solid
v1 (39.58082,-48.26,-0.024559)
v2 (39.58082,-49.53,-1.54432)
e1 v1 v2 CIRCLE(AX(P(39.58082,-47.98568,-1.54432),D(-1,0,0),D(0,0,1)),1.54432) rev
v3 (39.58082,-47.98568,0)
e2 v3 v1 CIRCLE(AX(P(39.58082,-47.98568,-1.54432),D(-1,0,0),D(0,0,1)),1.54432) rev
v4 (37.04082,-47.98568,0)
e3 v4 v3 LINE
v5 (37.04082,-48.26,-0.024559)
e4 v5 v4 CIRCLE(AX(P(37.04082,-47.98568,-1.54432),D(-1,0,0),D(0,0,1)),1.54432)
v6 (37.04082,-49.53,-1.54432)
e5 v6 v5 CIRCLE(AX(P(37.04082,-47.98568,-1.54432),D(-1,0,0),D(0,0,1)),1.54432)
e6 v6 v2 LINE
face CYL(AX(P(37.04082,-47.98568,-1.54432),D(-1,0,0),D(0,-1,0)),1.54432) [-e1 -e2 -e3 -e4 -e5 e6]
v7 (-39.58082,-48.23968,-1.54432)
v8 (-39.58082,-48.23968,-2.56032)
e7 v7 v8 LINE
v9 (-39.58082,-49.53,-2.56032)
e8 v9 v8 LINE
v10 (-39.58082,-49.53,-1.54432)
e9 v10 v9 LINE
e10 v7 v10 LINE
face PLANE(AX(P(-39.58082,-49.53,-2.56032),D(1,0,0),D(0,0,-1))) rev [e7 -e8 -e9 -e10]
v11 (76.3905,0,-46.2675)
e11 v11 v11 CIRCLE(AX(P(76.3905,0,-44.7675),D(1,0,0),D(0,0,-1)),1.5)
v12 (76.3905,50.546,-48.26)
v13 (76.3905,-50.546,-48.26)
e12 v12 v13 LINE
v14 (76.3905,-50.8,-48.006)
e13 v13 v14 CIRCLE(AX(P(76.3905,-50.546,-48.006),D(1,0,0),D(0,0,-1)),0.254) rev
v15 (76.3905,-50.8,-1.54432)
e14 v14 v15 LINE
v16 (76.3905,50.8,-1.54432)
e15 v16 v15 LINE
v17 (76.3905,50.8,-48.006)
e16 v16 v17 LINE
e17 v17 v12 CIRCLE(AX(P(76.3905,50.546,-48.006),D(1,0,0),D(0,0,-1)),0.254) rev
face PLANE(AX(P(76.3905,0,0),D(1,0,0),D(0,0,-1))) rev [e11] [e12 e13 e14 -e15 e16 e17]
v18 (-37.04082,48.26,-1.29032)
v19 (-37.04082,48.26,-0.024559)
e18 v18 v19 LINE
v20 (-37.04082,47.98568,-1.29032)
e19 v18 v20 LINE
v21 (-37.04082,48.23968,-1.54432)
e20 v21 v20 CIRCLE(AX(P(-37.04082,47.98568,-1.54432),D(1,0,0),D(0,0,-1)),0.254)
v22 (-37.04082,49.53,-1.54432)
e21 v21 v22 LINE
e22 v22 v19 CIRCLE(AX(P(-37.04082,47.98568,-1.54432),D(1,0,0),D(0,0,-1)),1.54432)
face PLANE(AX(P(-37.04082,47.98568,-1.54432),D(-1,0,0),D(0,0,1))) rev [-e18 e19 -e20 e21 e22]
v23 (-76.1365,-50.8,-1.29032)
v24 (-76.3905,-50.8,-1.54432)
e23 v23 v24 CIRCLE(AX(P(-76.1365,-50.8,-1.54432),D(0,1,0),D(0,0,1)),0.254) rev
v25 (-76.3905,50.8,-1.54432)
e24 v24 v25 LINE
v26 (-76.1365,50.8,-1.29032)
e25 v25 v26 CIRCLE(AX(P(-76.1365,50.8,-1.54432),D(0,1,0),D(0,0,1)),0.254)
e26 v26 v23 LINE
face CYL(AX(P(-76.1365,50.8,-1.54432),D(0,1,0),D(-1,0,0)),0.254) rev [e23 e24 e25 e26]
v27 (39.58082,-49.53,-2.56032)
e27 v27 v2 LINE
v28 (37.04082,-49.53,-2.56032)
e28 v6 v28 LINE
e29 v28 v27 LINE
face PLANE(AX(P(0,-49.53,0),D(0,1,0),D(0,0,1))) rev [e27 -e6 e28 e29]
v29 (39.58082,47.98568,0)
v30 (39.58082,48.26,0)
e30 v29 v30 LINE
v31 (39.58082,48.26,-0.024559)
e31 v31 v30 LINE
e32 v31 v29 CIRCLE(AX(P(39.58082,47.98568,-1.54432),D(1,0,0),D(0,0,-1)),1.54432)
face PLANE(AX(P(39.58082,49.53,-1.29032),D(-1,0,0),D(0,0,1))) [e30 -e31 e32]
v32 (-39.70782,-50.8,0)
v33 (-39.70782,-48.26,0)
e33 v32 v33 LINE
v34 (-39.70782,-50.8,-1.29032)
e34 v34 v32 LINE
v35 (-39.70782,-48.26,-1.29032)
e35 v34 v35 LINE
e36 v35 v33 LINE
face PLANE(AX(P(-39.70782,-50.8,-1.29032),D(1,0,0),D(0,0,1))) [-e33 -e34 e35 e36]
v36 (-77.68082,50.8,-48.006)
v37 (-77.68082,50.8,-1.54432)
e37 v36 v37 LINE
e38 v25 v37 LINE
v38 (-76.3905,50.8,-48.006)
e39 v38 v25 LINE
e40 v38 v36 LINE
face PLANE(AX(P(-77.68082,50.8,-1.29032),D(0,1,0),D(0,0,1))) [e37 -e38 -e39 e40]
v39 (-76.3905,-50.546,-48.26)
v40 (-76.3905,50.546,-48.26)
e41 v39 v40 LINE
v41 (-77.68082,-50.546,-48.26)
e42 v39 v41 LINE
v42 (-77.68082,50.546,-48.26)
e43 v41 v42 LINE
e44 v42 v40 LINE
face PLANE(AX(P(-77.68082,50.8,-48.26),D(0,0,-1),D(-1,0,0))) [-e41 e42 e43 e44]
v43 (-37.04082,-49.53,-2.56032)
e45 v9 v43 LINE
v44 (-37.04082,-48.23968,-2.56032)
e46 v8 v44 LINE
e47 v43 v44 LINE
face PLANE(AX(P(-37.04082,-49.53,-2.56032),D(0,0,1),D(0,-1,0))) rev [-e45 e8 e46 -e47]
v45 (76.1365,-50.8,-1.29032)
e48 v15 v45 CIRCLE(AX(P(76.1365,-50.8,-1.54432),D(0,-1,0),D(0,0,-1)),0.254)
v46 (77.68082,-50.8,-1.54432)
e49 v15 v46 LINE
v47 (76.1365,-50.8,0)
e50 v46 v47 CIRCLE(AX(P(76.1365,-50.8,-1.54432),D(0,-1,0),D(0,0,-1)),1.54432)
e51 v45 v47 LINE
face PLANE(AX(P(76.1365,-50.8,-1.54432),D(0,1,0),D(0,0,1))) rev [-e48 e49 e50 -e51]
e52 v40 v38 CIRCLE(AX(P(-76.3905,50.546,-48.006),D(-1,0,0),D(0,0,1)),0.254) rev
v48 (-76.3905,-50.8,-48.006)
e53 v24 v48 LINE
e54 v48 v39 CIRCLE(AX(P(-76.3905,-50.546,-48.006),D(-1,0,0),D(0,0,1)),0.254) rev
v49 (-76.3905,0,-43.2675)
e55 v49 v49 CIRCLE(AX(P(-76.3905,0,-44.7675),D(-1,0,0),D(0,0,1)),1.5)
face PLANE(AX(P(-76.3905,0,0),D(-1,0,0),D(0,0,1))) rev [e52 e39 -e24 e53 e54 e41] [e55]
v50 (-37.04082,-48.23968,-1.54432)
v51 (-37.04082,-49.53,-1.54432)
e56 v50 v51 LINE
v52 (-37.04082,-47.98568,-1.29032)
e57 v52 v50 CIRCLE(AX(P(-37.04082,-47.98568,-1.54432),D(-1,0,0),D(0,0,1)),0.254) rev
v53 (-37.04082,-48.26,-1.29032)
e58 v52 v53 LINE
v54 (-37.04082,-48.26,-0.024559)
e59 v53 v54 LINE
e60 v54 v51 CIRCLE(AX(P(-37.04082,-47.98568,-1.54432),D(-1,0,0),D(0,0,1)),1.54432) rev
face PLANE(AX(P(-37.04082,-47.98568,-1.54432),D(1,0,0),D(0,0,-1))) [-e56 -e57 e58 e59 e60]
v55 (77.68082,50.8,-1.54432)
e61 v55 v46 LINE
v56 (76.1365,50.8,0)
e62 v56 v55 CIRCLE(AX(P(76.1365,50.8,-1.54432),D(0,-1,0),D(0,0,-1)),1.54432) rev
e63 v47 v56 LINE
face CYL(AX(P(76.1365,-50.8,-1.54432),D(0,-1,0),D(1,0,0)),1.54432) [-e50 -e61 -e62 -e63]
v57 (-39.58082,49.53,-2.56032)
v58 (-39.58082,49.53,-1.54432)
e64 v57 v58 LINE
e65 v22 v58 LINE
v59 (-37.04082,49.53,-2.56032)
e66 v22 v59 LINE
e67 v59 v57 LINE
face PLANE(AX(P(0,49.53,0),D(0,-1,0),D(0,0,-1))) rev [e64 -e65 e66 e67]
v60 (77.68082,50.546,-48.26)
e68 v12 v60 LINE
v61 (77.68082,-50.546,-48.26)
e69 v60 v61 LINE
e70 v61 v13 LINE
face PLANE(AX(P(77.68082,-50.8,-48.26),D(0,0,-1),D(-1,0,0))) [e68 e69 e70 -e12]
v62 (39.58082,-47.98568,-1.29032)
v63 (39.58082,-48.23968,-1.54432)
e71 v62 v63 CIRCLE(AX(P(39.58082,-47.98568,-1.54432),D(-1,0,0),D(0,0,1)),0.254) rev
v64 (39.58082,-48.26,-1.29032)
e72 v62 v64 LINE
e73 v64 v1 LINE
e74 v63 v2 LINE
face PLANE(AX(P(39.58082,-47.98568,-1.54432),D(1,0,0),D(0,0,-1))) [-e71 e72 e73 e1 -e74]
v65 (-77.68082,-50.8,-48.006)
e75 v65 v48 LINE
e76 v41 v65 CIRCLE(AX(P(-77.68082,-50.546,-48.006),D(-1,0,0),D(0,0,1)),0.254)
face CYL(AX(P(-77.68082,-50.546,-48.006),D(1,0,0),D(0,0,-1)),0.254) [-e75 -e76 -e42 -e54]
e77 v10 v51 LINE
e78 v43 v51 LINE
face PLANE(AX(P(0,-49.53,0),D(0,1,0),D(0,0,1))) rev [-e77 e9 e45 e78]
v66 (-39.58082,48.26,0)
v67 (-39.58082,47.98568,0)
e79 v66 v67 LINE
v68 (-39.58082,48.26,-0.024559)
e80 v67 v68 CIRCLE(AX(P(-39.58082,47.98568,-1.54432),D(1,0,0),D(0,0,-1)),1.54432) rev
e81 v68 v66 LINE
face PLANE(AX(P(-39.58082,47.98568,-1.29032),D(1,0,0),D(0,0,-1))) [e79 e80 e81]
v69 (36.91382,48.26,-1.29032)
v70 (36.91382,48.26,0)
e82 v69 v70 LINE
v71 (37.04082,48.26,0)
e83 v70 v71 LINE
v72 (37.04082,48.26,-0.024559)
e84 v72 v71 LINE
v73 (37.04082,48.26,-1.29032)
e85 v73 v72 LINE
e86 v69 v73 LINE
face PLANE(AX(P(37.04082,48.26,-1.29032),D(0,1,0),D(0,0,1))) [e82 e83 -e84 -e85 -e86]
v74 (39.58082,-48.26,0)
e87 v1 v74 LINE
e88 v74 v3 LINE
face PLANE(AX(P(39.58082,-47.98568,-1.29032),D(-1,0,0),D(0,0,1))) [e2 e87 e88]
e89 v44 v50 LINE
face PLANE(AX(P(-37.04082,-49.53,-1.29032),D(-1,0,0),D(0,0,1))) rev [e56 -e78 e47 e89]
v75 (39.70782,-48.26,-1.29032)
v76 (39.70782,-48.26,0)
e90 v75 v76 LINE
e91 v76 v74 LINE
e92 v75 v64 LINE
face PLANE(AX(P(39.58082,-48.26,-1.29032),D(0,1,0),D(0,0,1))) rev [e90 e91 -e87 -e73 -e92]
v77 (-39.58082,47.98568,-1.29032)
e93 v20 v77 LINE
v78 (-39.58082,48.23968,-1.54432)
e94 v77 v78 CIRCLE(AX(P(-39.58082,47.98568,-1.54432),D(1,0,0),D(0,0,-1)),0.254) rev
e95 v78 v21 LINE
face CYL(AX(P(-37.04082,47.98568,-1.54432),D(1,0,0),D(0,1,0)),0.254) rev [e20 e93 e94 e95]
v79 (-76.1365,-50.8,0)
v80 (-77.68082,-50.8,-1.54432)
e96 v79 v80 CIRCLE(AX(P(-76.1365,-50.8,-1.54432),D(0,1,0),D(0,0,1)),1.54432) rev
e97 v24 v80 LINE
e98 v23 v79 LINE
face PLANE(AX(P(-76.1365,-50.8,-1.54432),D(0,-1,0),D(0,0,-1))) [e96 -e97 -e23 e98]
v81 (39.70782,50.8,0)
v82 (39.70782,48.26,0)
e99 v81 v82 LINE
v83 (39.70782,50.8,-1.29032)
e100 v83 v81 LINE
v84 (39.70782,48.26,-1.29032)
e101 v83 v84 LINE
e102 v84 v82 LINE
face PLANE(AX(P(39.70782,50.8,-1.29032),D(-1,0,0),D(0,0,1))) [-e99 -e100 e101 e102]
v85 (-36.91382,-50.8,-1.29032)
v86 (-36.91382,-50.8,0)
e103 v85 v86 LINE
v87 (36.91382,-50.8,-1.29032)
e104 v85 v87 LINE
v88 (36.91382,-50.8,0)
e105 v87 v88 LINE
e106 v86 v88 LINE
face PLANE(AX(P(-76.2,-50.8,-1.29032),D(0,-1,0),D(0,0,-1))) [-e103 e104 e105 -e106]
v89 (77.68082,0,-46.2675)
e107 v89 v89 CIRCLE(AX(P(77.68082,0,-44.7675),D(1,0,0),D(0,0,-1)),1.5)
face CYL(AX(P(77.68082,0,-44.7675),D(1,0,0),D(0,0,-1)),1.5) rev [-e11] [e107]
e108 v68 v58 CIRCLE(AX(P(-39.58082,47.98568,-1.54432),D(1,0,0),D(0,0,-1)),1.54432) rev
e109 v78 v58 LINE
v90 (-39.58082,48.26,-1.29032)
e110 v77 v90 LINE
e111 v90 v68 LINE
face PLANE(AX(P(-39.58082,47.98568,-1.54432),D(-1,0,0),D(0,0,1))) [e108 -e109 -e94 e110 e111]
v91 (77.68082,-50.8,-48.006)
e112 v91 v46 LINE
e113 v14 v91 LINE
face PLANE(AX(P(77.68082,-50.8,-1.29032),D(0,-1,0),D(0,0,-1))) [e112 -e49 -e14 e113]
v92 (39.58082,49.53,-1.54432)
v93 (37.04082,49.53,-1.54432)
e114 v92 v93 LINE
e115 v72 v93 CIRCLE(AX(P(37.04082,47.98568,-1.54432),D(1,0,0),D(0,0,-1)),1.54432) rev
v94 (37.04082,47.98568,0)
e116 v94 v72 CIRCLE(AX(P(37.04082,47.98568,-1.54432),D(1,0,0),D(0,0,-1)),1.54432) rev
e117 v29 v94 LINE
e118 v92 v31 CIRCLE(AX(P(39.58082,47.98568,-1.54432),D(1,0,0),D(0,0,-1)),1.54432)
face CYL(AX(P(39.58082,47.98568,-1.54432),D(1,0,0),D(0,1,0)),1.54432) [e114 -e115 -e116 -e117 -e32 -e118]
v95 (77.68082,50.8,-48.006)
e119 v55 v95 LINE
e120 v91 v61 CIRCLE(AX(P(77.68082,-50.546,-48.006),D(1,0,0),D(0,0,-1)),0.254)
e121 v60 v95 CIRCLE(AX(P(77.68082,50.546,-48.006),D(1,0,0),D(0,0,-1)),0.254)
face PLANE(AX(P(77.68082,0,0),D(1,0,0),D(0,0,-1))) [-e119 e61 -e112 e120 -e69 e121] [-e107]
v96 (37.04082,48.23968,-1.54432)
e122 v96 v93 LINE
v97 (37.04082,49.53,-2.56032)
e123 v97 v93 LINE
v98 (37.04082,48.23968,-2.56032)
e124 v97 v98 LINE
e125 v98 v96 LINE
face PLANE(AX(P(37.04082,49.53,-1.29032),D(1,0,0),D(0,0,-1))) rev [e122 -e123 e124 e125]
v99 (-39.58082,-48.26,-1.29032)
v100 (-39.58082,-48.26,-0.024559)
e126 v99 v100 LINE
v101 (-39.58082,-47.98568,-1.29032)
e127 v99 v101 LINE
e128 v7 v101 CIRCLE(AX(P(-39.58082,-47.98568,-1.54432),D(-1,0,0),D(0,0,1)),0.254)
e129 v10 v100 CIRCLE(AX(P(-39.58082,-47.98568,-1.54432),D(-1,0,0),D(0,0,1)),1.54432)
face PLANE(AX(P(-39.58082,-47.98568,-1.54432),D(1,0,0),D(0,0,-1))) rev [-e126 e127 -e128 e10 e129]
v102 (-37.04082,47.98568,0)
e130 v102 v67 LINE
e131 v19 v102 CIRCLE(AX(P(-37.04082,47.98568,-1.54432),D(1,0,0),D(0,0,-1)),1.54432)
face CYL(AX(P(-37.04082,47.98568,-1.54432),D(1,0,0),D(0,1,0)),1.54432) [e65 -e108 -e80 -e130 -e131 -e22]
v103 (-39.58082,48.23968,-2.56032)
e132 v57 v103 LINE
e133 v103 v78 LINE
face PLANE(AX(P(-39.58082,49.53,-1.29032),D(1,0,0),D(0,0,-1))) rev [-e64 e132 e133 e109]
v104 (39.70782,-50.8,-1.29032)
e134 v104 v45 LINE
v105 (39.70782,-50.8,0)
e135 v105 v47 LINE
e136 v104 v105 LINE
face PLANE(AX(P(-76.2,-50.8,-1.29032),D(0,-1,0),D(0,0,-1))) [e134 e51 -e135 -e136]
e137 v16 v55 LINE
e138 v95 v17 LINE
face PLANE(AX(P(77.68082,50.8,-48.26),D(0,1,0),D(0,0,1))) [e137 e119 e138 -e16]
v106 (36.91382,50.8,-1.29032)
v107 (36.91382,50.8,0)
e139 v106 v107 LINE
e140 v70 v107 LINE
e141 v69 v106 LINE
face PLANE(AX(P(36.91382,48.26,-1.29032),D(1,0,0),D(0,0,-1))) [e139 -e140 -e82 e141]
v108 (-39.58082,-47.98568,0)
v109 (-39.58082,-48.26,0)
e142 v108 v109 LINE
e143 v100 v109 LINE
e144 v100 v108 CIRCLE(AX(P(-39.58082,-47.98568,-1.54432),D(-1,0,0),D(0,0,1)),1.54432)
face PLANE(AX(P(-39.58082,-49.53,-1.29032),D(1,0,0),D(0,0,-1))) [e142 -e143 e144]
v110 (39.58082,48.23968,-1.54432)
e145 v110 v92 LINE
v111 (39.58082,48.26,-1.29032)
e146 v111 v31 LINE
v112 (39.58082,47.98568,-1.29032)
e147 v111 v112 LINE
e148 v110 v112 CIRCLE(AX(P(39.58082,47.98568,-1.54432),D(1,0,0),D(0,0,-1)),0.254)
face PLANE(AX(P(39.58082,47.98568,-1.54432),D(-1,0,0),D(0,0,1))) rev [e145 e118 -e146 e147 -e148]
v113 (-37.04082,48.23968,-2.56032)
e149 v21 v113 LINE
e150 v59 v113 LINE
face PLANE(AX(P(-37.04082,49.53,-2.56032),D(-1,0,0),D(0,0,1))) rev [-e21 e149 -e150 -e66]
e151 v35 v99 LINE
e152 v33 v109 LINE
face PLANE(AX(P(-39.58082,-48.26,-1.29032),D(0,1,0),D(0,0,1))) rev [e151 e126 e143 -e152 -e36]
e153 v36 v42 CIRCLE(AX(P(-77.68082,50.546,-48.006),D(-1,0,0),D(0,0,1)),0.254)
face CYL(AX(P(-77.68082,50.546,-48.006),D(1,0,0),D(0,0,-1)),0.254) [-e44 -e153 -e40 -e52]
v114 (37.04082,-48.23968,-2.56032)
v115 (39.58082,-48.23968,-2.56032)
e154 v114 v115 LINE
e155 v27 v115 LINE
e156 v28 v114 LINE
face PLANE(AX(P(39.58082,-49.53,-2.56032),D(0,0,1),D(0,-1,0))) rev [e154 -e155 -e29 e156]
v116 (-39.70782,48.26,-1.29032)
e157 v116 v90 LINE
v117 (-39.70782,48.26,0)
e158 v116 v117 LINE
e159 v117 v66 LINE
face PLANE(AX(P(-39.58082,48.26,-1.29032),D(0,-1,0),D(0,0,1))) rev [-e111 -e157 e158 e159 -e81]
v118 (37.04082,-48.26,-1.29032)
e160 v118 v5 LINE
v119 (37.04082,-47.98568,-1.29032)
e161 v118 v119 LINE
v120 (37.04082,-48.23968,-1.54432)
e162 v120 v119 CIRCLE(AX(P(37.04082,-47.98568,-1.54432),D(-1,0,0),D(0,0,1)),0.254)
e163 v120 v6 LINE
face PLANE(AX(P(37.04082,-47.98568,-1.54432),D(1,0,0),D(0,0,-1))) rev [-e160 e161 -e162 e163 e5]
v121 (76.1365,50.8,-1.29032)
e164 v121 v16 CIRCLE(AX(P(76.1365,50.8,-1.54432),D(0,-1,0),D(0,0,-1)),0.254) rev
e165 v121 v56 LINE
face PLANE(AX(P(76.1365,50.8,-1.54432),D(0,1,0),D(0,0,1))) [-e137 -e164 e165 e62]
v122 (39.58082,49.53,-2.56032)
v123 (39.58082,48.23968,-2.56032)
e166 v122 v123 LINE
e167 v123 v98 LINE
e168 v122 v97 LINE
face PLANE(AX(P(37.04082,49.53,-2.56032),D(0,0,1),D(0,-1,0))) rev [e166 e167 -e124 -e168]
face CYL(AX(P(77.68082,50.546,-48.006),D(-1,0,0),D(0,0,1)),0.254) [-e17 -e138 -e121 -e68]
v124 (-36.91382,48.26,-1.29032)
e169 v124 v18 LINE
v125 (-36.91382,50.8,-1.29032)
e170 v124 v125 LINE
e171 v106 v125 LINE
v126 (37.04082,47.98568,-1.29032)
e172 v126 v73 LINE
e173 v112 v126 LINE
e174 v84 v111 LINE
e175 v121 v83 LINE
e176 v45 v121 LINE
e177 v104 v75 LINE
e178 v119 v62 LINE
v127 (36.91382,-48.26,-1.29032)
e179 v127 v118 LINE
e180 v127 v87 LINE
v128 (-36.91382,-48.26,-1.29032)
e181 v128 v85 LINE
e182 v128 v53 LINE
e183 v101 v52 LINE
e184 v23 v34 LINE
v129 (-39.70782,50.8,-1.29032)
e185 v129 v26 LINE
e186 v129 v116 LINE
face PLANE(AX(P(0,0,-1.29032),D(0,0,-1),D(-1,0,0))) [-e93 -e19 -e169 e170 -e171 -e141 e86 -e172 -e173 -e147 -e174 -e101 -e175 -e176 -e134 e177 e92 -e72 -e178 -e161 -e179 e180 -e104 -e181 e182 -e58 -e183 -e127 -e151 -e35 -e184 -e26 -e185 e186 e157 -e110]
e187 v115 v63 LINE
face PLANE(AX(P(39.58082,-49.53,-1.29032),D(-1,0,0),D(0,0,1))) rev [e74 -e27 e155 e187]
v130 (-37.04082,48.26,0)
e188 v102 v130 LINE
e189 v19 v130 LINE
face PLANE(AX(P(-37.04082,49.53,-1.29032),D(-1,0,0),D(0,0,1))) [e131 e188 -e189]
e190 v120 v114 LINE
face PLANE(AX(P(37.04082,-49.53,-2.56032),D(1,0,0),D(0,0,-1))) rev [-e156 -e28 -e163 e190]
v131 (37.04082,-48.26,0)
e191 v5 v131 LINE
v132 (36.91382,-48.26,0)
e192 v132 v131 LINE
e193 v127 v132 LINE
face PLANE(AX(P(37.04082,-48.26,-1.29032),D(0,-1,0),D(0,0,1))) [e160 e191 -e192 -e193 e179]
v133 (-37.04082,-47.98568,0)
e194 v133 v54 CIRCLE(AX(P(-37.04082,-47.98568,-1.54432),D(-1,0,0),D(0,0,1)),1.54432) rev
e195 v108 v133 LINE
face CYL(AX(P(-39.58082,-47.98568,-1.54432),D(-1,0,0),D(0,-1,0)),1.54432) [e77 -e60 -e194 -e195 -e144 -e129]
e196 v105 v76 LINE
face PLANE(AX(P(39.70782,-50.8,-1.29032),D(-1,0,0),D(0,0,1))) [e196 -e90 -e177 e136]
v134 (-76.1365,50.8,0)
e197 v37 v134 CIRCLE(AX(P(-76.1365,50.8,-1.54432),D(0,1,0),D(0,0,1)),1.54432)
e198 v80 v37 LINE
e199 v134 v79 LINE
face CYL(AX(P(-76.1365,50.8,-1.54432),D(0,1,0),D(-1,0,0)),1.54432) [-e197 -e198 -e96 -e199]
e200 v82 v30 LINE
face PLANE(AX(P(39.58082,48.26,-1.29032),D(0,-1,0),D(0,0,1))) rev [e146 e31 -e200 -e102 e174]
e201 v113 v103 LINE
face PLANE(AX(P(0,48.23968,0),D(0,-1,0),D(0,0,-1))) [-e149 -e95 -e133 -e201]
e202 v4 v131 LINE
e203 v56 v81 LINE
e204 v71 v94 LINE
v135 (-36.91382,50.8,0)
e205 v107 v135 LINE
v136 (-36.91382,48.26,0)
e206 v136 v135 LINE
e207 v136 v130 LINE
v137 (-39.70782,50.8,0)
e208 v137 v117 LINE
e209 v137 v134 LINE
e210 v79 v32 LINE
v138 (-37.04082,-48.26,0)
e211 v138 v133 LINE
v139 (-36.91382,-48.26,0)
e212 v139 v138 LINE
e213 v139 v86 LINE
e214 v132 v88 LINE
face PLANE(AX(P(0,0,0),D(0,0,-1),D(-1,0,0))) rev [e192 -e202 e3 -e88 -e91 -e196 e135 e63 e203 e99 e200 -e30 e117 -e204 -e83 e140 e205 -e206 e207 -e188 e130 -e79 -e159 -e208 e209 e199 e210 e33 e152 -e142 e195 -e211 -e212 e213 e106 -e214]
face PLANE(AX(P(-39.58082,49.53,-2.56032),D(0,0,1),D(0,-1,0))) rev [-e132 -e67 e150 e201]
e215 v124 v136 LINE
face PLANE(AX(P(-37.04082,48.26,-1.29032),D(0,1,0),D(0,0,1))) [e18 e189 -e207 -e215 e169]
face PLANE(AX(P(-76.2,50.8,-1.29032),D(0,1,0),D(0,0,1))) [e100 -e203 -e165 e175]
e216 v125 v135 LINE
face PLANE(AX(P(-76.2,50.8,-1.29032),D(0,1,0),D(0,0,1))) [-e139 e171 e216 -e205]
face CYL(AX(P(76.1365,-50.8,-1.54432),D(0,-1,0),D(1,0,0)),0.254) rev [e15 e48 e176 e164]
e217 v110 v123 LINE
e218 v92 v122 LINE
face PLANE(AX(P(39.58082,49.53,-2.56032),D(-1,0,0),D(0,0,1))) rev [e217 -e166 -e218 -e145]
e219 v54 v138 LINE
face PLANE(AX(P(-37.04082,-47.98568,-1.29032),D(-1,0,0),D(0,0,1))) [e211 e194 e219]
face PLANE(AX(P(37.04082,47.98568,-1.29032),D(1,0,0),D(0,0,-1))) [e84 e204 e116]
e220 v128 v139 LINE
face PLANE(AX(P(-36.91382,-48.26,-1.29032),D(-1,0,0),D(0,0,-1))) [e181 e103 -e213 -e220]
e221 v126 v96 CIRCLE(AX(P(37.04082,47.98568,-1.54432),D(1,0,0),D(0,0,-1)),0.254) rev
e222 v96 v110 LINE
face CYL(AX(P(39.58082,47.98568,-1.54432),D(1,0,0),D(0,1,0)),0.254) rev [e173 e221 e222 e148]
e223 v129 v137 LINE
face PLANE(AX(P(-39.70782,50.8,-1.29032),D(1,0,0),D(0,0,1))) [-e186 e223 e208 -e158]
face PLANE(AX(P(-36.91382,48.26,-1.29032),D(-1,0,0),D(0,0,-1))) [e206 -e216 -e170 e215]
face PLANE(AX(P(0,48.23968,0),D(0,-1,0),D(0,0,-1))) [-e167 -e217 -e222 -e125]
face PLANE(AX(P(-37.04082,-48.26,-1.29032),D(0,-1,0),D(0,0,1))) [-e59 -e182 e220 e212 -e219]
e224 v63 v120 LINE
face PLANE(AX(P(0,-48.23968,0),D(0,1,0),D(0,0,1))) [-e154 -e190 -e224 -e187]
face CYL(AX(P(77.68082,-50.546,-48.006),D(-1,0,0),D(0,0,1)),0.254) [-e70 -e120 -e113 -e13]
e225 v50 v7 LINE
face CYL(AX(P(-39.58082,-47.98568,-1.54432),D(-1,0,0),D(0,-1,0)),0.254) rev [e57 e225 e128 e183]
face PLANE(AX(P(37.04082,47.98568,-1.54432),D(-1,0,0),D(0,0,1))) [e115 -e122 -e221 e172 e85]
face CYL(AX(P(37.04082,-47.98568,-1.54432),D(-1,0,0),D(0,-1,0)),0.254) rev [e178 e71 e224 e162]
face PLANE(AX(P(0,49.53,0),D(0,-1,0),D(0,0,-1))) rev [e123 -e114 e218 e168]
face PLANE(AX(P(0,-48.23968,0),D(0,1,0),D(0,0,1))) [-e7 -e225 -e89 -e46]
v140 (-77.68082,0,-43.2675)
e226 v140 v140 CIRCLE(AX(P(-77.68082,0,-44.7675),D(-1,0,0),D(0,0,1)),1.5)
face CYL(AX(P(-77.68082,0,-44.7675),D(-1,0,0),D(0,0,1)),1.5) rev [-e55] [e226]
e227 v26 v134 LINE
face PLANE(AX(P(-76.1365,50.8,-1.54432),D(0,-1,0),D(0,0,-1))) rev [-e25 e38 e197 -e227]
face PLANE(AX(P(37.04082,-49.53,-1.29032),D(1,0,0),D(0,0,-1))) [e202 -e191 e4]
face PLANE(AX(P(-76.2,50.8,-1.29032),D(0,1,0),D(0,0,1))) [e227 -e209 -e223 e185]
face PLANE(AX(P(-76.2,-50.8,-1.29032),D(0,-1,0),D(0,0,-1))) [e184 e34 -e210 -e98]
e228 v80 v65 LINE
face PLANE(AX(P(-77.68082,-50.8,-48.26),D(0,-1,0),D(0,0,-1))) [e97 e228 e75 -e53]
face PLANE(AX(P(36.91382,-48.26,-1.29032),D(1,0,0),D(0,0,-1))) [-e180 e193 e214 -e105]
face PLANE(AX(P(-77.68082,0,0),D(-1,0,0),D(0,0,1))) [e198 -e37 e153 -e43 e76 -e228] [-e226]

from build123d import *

# Parameters (mm, degrees)
SKETCH1_W                      = 152.4
SKETCH1_H                      = 101.6
BASE_FLANGE1_DEPTH             = 1.29032
EDGE_FLANGE1_STRIP_W           = 5.85978
EDGE_FLANGE1_STRIP_H           = 1.29032
EDGE_FLANGE1_STRIP_CUT_DEPTH   = 101.6
EDGE_FLANGE1_STRIP_2_W         = 5.85978
EDGE_FLANGE1_STRIP_2_H         = 1.29032
EDGE_FLANGE1_STRIP_CUT_2_DEPTH = 101.6
EDGE_FLANGE1_DEPTH             = 101.6
EDGE_FLANGE1_BEND_DEPTH        = 101.6
M3X0_5_TAPPED_HOLE1_REACH      = 172.432
M3X0_5_TAPPED_HOLE1_BORE_R     = 1.5
BREAK_CORNER1_START            = -77.68082
BREAK_CORNER1_DEPTH            = 155.36164
CUT_THICKEN1_START             = 48.26
CUT_THICKEN1_OUTLINE_W         = 0.127
CUT_THICKEN1_OUTLINE_H         = 1.29032
CUT_THICKEN1_DEPTH             = 2.54
CUT_THICKEN2_START             = 48.26
CUT_THICKEN2_OUTLINE_W         = 0.127
CUT_THICKEN2_OUTLINE_H         = 1.29032
CUT_THICKEN2_DEPTH             = 2.54
MIRROR7_START                  = 48.26
MIRROR7_COPY_1_SKETCH_W        = 0.127
MIRROR7_COPY_1_SKETCH_H        = 1.29032
MIRROR7_COPY_1_DEPTH           = 2.54
MIRROR7_COPY_2_SKETCH_W        = 0.127
MIRROR7_COPY_2_SKETCH_H        = 1.29032
MIRROR7_COPY_2_DEPTH           = 2.54
MOVE_FACE1_BY                  = 1.27
MOVE_FACE1_2_BY                = 1.27
MOVE_FACE1_3_BY                = 1.27
MOVE_FACE1_4_BY                = 1.27
EDGE_FLANGE2_STRIP_W           = 5.66928
EDGE_FLANGE2_STRIP_H           = 1.29032
EDGE_FLANGE2_STRIP_CUT_DEPTH   = 2.54
EDGE_FLANGE2_STRIP_2_W         = 5.66928
EDGE_FLANGE2_STRIP_2_H         = 1.29032
EDGE_FLANGE2_STRIP_CUT_2_DEPTH = 2.54
EDGE_FLANGE2_STRIP_3_W         = 5.66928
EDGE_FLANGE2_STRIP_3_H         = 1.29032
EDGE_FLANGE2_STRIP_CUT_3_DEPTH = 2.54
EDGE_FLANGE2_STRIP_4_W         = 5.66928
EDGE_FLANGE2_STRIP_4_H         = 1.29032
EDGE_FLANGE2_STRIP_CUT_4_DEPTH = 2.54
EDGE_FLANGE2_DEPTH             = 2.54
EDGE_FLANGE2_BEND_DEPTH        = 2.54
EDGE_FLANGE2_BEND_2_DEPTH      = 2.54
EDGE_FLANGE2_BEND_3_DEPTH      = 2.54


# Read off the part's stored shape, not the designer's step: Break-Corner1, Cut-Thicken1, Cut-Thicken2
# Sheet-metal steps are written as plain solids
with BuildPart() as part:
    # Sketch1 → Base-Flange1 (new body)
    with BuildSketch(Plane.XY):
        Rectangle(SKETCH1_W, SKETCH1_H)
    extrude(amount=-BASE_FLANGE1_DEPTH)

    # Edge-Flange1 strip (across the edge) → Edge-Flange1 strip cut (cut)
    with BuildSketch(Plane(origin=(-76.3905, -50.8, -1.29032), x_dir=(1, 0, 0), z_dir=(0, 1, 0))):
        with Locations((-2.67589, -0.64516)):
            Rectangle(EDGE_FLANGE1_STRIP_W, EDGE_FLANGE1_STRIP_H)
    extrude(amount=EDGE_FLANGE1_STRIP_CUT_DEPTH, mode=Mode.SUBTRACT)

    # Edge-Flange1 strip 2 (across the edge) → Edge-Flange1 strip cut 2 (cut)
    with BuildSketch(Plane(origin=(76.3905, 50.8, -1.29032), x_dir=(-1, 0, 0), z_dir=(0, -1, 0))):
        with Locations((-2.67589, -0.64516)):
            Rectangle(EDGE_FLANGE1_STRIP_2_W, EDGE_FLANGE1_STRIP_2_H)
    extrude(amount=EDGE_FLANGE1_STRIP_CUT_2_DEPTH, mode=Mode.SUBTRACT)

    # Edge-Flange1 section (across the edge) → Edge-Flange1 (add)
    with BuildSketch(Plane(origin=(-76.3905, -50.8, -1.29032), x_dir=(1, 0, 0), z_dir=(0, 1, 0))):
        with BuildLine():
            Line((-1.29032, 0.254), (-1.29032, 46.96968))
            Line((-1.29032, 46.96968), (0, 46.96968))
            Line((0, 46.96968), (0, 0.254))
            ThreePointArc((0, 0.254), (0.074394878, 0.074394878), (0.254, 0))
            Line((0.254, 0), (0.254, -1.29032))
            ThreePointArc((0.254, -1.29032), (-0.837999144, -0.837999144), (-1.29032, 0.254))
        make_face()
    extrude(amount=EDGE_FLANGE1_DEPTH)

    # Edge-Flange1 section 2 (across the edge) → Edge-Flange1 bend (add)
    with BuildSketch(Plane(origin=(76.3905, 50.8, -1.29032), x_dir=(-1, 0, 0), z_dir=(0, -1, 0))):
        with BuildLine():
            Line((-1.29032, 0.254), (-1.29032, 46.96968))
            Line((-1.29032, 46.96968), (0, 46.96968))
            Line((0, 46.96968), (0, 0.254))
            ThreePointArc((0, 0.254), (0.074394878, 0.074394878), (0.254, 0))
            Line((0.254, 0), (0.254, -1.29032))
            ThreePointArc((0.254, -1.29032), (-0.837999144, -0.837999144), (-1.29032, 0.254))
        make_face()
    extrude(amount=EDGE_FLANGE1_BEND_DEPTH)

    # M3x0.5 Tapped Hole1 bore → M3x0.5 Tapped Hole1 (cut, up to next)
    with BuildSketch(Plane.ZY.offset(77.68082), mode=Mode.PRIVATE) as m3x0_5_tapped_hole1_sk1:
        with Locations((-44.7675, 0)):
            Circle(M3X0_5_TAPPED_HOLE1_BORE_R)
    m3x0_5_tapped_hole1_tool1 = extrude(m3x0_5_tapped_hole1_sk1.sketch, amount=-M3X0_5_TAPPED_HOLE1_REACH, mode=Mode.PRIVATE) & part.part
    m3x0_5_tapped_hole1 = m3x0_5_tapped_hole1_tool1.solids().sort_by_distance((-77.68082, 0, -44.7675))[0]
    add(m3x0_5_tapped_hole1, mode=Mode.SUBTRACT)

    # Mirror1: M3x0.5 Tapped Hole1 across plane
    add(m3x0_5_tapped_hole1.mirror(Plane(origin=(0, 0, 0), x_dir=(0, 0, 1), z_dir=(1, 0, 0))), mode=Mode.SUBTRACT)

    # Break-Corner1 outline → Break-Corner1 (cut)
    with BuildSketch(Plane.YZ.offset(BREAK_CORNER1_START)):
        with BuildLine():
            Line((50.8, -48.26), (50.8, -48.006))
            ThreePointArc((50.8, -48.006), (50.725605122, -48.185605122), (50.546, -48.26))
            Line((50.546, -48.26), (50.8, -48.26))
        make_face()
        with BuildLine():
            Line((-50.8, -48.26), (-50.546, -48.26))
            ThreePointArc((-50.546, -48.26), (-50.725605122, -48.185605122), (-50.8, -48.006))
            Line((-50.8, -48.006), (-50.8, -48.26))
        make_face()
    extrude(amount=BREAK_CORNER1_DEPTH, mode=Mode.SUBTRACT)

    # Cut-Thicken1 outline → Cut-Thicken1 (cut)
    with BuildSketch(Plane(origin=(0, 0, 0), x_dir=(1, 0, 0), z_dir=(0, 1, 0)).offset(CUT_THICKEN1_START)):
        with Locations((36.97732, 0.64516)):
            Rectangle(CUT_THICKEN1_OUTLINE_W, CUT_THICKEN1_OUTLINE_H)
    cut_thicken1 = extrude(amount=CUT_THICKEN1_DEPTH, mode=Mode.SUBTRACT)

    # Cut-Thicken2 outline → Cut-Thicken2 (cut)
    with BuildSketch(Plane(origin=(0, 0, 0), x_dir=(1, 0, 0), z_dir=(0, 1, 0)).offset(CUT_THICKEN2_START)):
        with Locations((39.64432, 0.64516)):
            Rectangle(CUT_THICKEN2_OUTLINE_W, CUT_THICKEN2_OUTLINE_H)
    cut_thicken2 = extrude(amount=CUT_THICKEN2_DEPTH, mode=Mode.SUBTRACT)

    # Mirror6: Cut-Thicken1, Cut-Thicken2 across plane
    add(cut_thicken1.mirror(Plane(origin=(0, 0, 0), x_dir=(0, 0, 1), z_dir=(1, 0, 0))), mode=Mode.SUBTRACT)
    add(cut_thicken2.mirror(Plane(origin=(0, 0, 0), x_dir=(0, 0, 1), z_dir=(1, 0, 0))), mode=Mode.SUBTRACT)

    # Mirror7: Cut-Thicken1, Cut-Thicken2 across plane
    add(cut_thicken1.mirror(Plane.ZX), mode=Mode.SUBTRACT)
    add(cut_thicken2.mirror(Plane.ZX), mode=Mode.SUBTRACT)

    # Mirror7 copy 1 sketch → Mirror7 copy 1 (cut)
    with BuildSketch(Plane(origin=(0, 0, 0), x_dir=(-1, 0, 0), z_dir=(0, -1, 0)).offset(MIRROR7_START)):
        with Locations((36.97732, 0.64516)):
            Rectangle(MIRROR7_COPY_1_SKETCH_W, MIRROR7_COPY_1_SKETCH_H)
    extrude(amount=MIRROR7_COPY_1_DEPTH, mode=Mode.SUBTRACT)

    # Mirror7 copy 2 sketch → Mirror7 copy 2 (cut)
    with BuildSketch(Plane(origin=(0, 0, 0), x_dir=(-1, 0, 0), z_dir=(0, -1, 0)).offset(MIRROR7_START)):
        with Locations((39.64432, 0.64516)):
            Rectangle(MIRROR7_COPY_2_SKETCH_W, MIRROR7_COPY_2_SKETCH_H)
    extrude(amount=MIRROR7_COPY_2_DEPTH, mode=Mode.SUBTRACT)

    # Move Face1: a face moved inward by 1.27
    extrude(part.faces().sort_by_distance((-38.31082, -50.8, -0.64516))[0], amount=MOVE_FACE1_BY, dir=(0, 1, 0), mode=Mode.SUBTRACT)

    # Move Face1 2: a face moved inward by 1.27
    extrude(part.faces().sort_by_distance((38.31082, -50.8, -0.64516))[0], amount=MOVE_FACE1_2_BY, dir=(0, 1, 0), mode=Mode.SUBTRACT)

    # Move Face1 3: a face moved inward by 1.27
    extrude(part.faces().sort_by_distance((-38.31082, 50.8, -0.64516))[0], amount=MOVE_FACE1_3_BY, dir=(0, -1, 0), mode=Mode.SUBTRACT)

    # Move Face1 4: a face moved inward by 1.27
    extrude(part.faces().sort_by_distance((38.31082, 50.8, -0.64516))[0], amount=MOVE_FACE1_4_BY, dir=(0, -1, 0), mode=Mode.SUBTRACT)

    # Edge-Flange2 strip (across the edge) → Edge-Flange2 strip cut (cut)
    with BuildSketch(Plane(origin=(37.04082, 49.53, -1.29032), x_dir=(0, -1, 0), z_dir=(1, 0, 0))):
        with Locations((-1.29032, -0.64516)):
            Rectangle(EDGE_FLANGE2_STRIP_W, EDGE_FLANGE2_STRIP_H)
    extrude(amount=EDGE_FLANGE2_STRIP_CUT_DEPTH, mode=Mode.SUBTRACT)

    # Edge-Flange2 strip 2 (across the edge) → Edge-Flange2 strip cut 2 (cut)
    with BuildSketch(Plane(origin=(-39.58082, 49.53, -1.29032), x_dir=(0, -1, 0), z_dir=(1, 0, 0))):
        with Locations((-1.29032, -0.64516)):
            Rectangle(EDGE_FLANGE2_STRIP_2_W, EDGE_FLANGE2_STRIP_2_H)
    extrude(amount=EDGE_FLANGE2_STRIP_CUT_2_DEPTH, mode=Mode.SUBTRACT)

    # Edge-Flange2 strip 3 (across the edge) → Edge-Flange2 strip cut 3 (cut)
    with BuildSketch(Plane(origin=(39.58082, -49.53, -1.29032), x_dir=(0, 1, 0), z_dir=(-1, 0, 0))):
        with Locations((-1.29032, -0.64516)):
            Rectangle(EDGE_FLANGE2_STRIP_3_W, EDGE_FLANGE2_STRIP_3_H)
    extrude(amount=EDGE_FLANGE2_STRIP_CUT_3_DEPTH, mode=Mode.SUBTRACT)

    # Edge-Flange2 strip 4 (across the edge) → Edge-Flange2 strip cut 4 (cut)
    with BuildSketch(Plane(origin=(-37.04082, -49.53, -1.29032), x_dir=(0, 1, 0), z_dir=(-1, 0, 0))):
        with Locations((-1.29032, -0.64516)):
            Rectangle(EDGE_FLANGE2_STRIP_4_W, EDGE_FLANGE2_STRIP_4_H)
    extrude(amount=EDGE_FLANGE2_STRIP_CUT_4_DEPTH, mode=Mode.SUBTRACT)

    # Edge-Flange2 section (across the edge) → Edge-Flange2 (add)
    with BuildSketch(Plane(origin=(37.04082, 49.53, -1.29032), x_dir=(0, -1, 0), z_dir=(1, 0, 0))):
        with BuildLine():
            Line((0, 0.254), (0, 1.27))
            Line((0, 1.27), (1.29032, 1.27))
            Line((1.29032, 1.27), (1.29032, 0.254))
            ThreePointArc((1.29032, 0.254), (1.364714878, 0.074394878), (1.54432, 0))
            Line((1.54432, 0), (1.54432, -1.29032))
            ThreePointArc((1.54432, -1.29032), (0.452320856, -0.837999144), (0, 0.254))
        make_face()
    extrude(amount=EDGE_FLANGE2_DEPTH)

    # Edge-Flange2 section 2 (across the edge) → Edge-Flange2 bend (add)
    with BuildSketch(Plane(origin=(-39.58082, 49.53, -1.29032), x_dir=(0, -1, 0), z_dir=(1, 0, 0))):
        with BuildLine():
            Line((0, 0.254), (0, 1.27))
            Line((0, 1.27), (1.29032, 1.27))
            Line((1.29032, 1.27), (1.29032, 0.254))
            ThreePointArc((1.29032, 0.254), (1.364714878, 0.074394878), (1.54432, 0))
            Line((1.54432, 0), (1.54432, -1.29032))
            ThreePointArc((1.54432, -1.29032), (0.452320856, -0.837999144), (0, 0.254))
        make_face()
    extrude(amount=EDGE_FLANGE2_BEND_DEPTH)

    # Edge-Flange2 section 3 (across the edge) → Edge-Flange2 bend 2 (add)
    with BuildSketch(Plane(origin=(39.58082, -49.53, -1.29032), x_dir=(0, 1, 0), z_dir=(-1, 0, 0))):
        with BuildLine():
            Line((0, 0.254), (0, 1.27))
            Line((0, 1.27), (1.29032, 1.27))
            Line((1.29032, 1.27), (1.29032, 0.254))
            ThreePointArc((1.29032, 0.254), (1.364714878, 0.074394878), (1.54432, 0))
            Line((1.54432, 0), (1.54432, -1.29032))
            ThreePointArc((1.54432, -1.29032), (0.452320856, -0.837999144), (0, 0.254))
        make_face()
    extrude(amount=EDGE_FLANGE2_BEND_2_DEPTH)

    # Edge-Flange2 section 4 (across the edge) → Edge-Flange2 bend 3 (add)
    with BuildSketch(Plane(origin=(-37.04082, -49.53, -1.29032), x_dir=(0, 1, 0), z_dir=(-1, 0, 0))):
        with BuildLine():
            Line((0, 0.254), (0, 1.27))
            Line((0, 1.27), (1.29032, 1.27))
            Line((1.29032, 1.27), (1.29032, 0.254))
            ThreePointArc((1.29032, 0.254), (1.364714878, 0.074394878), (1.54432, 0))
            Line((1.54432, 0), (1.54432, -1.29032))
            ThreePointArc((1.54432, -1.29032), (0.452320856, -0.837999144), (0, 0.254))
        make_face()
    extrude(amount=EDGE_FLANGE2_BEND_3_DEPTH)


solid = part.part
